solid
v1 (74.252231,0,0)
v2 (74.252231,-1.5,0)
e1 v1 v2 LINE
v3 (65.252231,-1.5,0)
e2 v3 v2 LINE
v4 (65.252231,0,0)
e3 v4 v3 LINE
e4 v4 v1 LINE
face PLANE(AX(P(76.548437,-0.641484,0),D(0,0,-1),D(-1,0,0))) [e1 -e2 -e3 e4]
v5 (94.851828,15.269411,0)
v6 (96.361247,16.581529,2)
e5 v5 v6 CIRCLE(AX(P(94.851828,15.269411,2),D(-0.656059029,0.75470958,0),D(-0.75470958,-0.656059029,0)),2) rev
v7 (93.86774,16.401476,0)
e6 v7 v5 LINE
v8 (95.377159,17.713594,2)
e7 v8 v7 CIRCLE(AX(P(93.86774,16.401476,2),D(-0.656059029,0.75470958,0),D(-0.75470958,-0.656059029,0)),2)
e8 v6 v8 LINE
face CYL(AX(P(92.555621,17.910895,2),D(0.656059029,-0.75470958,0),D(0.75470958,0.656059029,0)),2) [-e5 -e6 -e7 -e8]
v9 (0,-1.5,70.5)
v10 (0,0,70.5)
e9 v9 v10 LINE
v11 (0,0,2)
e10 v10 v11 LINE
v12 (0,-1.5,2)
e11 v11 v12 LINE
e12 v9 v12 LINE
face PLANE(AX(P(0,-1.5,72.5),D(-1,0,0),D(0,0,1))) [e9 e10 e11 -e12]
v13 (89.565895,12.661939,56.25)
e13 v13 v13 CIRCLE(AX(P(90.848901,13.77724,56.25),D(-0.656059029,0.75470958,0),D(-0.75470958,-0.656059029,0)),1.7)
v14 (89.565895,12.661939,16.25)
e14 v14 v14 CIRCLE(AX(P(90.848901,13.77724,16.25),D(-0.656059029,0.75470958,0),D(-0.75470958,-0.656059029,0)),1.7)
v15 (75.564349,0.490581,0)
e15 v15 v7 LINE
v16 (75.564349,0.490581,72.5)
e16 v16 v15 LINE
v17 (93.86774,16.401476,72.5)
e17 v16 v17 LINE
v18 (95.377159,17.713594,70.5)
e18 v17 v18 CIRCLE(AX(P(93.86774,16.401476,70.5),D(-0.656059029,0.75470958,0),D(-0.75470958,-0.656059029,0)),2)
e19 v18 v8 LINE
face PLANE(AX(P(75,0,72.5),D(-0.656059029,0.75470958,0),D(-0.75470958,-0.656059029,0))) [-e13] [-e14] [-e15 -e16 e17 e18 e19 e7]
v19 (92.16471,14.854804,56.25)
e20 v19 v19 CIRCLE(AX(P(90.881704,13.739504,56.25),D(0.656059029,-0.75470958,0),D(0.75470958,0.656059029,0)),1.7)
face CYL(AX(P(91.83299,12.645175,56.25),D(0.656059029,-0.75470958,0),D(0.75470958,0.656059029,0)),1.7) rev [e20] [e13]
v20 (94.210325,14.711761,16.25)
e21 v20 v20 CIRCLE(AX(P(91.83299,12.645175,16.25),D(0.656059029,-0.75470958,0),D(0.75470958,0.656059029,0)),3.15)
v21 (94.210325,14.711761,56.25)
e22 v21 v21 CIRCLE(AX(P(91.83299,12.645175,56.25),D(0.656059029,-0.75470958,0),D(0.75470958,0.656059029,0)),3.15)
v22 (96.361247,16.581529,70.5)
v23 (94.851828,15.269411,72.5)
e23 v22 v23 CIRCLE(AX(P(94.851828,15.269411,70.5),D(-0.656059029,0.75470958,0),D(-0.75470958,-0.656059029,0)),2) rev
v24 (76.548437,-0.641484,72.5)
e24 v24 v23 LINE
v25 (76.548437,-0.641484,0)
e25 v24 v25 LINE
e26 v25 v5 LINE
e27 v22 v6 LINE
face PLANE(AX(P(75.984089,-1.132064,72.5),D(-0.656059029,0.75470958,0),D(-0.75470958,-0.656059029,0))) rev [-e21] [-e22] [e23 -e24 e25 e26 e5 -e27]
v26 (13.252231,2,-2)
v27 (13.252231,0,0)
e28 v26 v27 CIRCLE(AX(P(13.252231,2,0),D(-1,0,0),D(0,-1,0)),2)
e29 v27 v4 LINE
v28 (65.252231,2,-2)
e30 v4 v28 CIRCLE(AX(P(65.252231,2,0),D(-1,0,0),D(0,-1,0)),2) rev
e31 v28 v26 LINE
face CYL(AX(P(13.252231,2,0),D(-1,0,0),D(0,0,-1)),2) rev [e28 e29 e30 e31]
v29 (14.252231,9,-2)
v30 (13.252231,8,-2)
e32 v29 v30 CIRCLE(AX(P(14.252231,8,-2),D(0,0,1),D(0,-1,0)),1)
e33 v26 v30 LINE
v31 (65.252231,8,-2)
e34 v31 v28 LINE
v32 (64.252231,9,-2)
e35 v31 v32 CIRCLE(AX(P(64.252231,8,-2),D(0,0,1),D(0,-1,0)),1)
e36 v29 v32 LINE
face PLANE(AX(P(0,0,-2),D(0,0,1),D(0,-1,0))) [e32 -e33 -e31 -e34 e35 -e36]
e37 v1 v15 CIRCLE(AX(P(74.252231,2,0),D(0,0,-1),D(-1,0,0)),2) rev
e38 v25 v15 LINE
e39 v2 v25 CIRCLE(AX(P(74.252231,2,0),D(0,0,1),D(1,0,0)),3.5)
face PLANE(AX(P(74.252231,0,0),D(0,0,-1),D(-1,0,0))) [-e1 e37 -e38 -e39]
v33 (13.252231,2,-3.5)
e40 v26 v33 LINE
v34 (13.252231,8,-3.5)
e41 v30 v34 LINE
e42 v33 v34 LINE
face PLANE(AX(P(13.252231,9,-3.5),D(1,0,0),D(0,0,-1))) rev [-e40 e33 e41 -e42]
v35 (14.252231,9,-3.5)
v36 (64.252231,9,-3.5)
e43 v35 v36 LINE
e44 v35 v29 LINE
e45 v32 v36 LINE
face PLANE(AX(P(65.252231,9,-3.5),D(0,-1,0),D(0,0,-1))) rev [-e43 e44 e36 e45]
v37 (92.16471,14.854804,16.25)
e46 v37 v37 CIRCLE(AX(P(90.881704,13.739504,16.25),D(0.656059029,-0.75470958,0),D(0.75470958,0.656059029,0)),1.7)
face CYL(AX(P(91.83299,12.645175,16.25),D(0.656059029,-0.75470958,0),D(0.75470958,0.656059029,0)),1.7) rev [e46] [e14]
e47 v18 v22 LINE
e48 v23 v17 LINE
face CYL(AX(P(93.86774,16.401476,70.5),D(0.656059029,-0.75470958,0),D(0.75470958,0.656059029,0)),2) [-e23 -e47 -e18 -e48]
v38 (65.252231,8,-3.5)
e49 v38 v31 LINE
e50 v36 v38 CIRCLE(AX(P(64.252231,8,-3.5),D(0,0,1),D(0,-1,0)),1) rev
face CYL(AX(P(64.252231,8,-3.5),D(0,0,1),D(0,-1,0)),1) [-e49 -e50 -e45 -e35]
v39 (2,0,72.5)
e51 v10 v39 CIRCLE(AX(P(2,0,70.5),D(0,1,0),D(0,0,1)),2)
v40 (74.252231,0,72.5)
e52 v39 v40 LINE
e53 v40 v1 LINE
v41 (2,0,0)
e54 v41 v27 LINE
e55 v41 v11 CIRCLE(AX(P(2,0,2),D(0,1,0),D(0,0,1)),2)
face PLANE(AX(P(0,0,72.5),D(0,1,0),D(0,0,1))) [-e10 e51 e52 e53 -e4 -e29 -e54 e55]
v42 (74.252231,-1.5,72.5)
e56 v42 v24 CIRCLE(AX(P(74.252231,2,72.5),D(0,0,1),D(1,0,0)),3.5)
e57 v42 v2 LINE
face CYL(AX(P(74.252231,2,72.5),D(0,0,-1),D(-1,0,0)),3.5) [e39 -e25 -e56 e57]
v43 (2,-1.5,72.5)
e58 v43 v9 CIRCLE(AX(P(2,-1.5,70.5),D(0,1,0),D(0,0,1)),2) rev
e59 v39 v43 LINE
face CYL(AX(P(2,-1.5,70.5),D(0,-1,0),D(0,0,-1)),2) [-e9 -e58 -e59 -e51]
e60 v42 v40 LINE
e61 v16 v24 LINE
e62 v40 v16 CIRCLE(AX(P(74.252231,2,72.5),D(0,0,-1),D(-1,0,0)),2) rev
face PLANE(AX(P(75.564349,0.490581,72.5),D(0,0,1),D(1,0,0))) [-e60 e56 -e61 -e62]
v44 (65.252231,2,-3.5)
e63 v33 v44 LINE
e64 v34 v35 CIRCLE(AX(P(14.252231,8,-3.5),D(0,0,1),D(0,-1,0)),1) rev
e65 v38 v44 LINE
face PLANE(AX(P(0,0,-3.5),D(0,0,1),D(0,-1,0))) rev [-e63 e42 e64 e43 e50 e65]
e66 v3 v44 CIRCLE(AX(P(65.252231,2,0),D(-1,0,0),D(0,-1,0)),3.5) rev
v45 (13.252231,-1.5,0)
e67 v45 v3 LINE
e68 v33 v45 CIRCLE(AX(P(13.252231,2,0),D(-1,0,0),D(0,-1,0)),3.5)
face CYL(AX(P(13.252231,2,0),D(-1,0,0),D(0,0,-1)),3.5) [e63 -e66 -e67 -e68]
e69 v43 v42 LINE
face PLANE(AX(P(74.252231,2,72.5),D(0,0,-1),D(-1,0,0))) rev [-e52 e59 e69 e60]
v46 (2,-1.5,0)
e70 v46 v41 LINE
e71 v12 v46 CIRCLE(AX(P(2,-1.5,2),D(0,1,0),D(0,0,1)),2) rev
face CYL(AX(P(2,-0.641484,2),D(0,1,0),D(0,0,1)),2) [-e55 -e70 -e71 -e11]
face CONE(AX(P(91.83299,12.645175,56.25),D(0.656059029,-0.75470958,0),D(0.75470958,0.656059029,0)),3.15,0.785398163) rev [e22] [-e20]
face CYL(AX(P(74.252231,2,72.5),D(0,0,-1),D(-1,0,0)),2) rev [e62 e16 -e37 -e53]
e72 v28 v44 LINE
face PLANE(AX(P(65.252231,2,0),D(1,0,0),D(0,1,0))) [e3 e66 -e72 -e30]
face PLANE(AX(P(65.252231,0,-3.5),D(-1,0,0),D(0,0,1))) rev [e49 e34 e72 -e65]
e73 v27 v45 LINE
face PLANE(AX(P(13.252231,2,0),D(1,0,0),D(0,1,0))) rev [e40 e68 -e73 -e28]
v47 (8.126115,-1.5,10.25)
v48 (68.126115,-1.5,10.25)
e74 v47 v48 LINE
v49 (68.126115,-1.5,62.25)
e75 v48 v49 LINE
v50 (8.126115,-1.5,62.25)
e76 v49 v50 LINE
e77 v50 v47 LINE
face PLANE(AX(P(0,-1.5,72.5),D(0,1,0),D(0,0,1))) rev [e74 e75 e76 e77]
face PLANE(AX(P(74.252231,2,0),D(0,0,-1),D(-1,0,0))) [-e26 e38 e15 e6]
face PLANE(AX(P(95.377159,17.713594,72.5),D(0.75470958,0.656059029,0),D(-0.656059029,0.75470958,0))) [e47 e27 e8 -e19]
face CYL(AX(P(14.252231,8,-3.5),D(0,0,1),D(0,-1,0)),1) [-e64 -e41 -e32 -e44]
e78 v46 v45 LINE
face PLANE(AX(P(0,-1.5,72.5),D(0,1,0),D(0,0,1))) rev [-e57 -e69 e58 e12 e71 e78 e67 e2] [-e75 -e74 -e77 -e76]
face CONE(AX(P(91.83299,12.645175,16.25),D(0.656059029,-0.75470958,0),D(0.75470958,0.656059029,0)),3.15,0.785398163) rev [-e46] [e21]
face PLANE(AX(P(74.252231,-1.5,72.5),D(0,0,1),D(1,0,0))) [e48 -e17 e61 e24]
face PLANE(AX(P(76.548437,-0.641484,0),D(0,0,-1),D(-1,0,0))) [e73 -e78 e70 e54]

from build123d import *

# Parameters (mm, degrees)
T_LE_DE_BASE_PLI_E1_DEPTH                      = 72.5
CONG_1_R                                       = 2
FRAISAGE_POUR_VIS_T_TE_FRAIS_E_M31_D           = 3.4
FRAISAGE_POUR_VIS_T_TE_FRAIS_E_M31_CSINK_D     = 6.3
FRAISAGE_POUR_VIS_T_TE_FRAIS_E_M31_CSINK_ANGLE = 90
T_LE_PLI_E_SUR_AR_TE1_DEPTH                    = 52
CONG_2_R                                       = 1


# Sheet-metal steps are written as plain solids
with BuildPart() as part:
    # Esquisse1 → Tôle de base pliée1 (new body)
    with BuildSketch(Plane.XY):
        with BuildLine():
            Line((0, 0), (74.252230641, 0))
            ThreePointArc((74.252230641, 0), (74.952645404, 0.126655622), (75.564348699, 0.49058084))
            Line((75.564348699, 0.49058084), (95.377158666, 17.713593783))
            Line((95.377158666, 17.713593783), (96.36124721, 16.581529412))
            Line((96.36124721, 16.581529412), (76.548437242, -0.641483531))
            ThreePointArc((76.548437242, -0.641483531), (75.477956475, -1.278352662), (74.252230641, -1.5))
            Line((74.252230641, -1.5), (0, -1.5))
            Line((0, -1.5), (0, 0))
        make_face()
    extrude(amount=T_LE_DE_BASE_PLI_E1_DEPTH)

    # Congé1
    cong_1_edges = [part.edges().sort_by_distance(p)[0] for p in [
        (0, -0.75, 72.5),
        (95.869202938, 17.147561598, 72.5),
        (0, -0.75, 0),
        (95.869202938, 17.147561598, 0),
    ]]
    fillet(cong_1_edges, radius=CONG_1_R)

    # Fraisage pour vis à tête fraisée M31 (through all)
    with Locations(Plane(origin=(33.265097257, -38.267116948, 0), x_dir=(0, 0, -1), z_dir=(0.6560590289905085, -0.7547095802227711, 0))):
        with Locations((-56.25, 77.603218517), (-16.25, 77.603218517)):
            CounterSinkHole(FRAISAGE_POUR_VIS_T_TE_FRAIS_E_M31_D / 2, FRAISAGE_POUR_VIS_T_TE_FRAIS_E_M31_CSINK_D / 2, counter_sink_angle=FRAISAGE_POUR_VIS_T_TE_FRAIS_E_M31_CSINK_ANGLE)

    # Tôle pliée sur arête1 section (across the edge) → Tôle pliée sur arête1 (add)
    with BuildSketch(Plane(origin=(65.252230641, 0, -2), x_dir=(0, 0, 1), z_dir=(-1, 0, 0))):
        with BuildLine():
            Line((-1.5, 2), (-1.5, 9))
            Line((-1.5, 9), (0, 9))
            Line((0, 9), (0, 2))
            ThreePointArc((0, 2), (0.585786438, 0.585786438), (2, 0))
            Line((2, 0), (2, -1.5))
            ThreePointArc((2, -1.5), (-0.474873734, -0.474873734), (-1.5, 2))
        make_face()
    extrude(amount=T_LE_PLI_E_SUR_AR_TE1_DEPTH)

    # Congé2
    cong_2_edges = [part.edges().sort_by_distance(p)[0] for p in [
        (65.252230641, 9, -2.75),
        (13.252230641, 9, -2.75),
    ]]
    fillet(cong_2_edges, radius=CONG_2_R)


solid = part.part
